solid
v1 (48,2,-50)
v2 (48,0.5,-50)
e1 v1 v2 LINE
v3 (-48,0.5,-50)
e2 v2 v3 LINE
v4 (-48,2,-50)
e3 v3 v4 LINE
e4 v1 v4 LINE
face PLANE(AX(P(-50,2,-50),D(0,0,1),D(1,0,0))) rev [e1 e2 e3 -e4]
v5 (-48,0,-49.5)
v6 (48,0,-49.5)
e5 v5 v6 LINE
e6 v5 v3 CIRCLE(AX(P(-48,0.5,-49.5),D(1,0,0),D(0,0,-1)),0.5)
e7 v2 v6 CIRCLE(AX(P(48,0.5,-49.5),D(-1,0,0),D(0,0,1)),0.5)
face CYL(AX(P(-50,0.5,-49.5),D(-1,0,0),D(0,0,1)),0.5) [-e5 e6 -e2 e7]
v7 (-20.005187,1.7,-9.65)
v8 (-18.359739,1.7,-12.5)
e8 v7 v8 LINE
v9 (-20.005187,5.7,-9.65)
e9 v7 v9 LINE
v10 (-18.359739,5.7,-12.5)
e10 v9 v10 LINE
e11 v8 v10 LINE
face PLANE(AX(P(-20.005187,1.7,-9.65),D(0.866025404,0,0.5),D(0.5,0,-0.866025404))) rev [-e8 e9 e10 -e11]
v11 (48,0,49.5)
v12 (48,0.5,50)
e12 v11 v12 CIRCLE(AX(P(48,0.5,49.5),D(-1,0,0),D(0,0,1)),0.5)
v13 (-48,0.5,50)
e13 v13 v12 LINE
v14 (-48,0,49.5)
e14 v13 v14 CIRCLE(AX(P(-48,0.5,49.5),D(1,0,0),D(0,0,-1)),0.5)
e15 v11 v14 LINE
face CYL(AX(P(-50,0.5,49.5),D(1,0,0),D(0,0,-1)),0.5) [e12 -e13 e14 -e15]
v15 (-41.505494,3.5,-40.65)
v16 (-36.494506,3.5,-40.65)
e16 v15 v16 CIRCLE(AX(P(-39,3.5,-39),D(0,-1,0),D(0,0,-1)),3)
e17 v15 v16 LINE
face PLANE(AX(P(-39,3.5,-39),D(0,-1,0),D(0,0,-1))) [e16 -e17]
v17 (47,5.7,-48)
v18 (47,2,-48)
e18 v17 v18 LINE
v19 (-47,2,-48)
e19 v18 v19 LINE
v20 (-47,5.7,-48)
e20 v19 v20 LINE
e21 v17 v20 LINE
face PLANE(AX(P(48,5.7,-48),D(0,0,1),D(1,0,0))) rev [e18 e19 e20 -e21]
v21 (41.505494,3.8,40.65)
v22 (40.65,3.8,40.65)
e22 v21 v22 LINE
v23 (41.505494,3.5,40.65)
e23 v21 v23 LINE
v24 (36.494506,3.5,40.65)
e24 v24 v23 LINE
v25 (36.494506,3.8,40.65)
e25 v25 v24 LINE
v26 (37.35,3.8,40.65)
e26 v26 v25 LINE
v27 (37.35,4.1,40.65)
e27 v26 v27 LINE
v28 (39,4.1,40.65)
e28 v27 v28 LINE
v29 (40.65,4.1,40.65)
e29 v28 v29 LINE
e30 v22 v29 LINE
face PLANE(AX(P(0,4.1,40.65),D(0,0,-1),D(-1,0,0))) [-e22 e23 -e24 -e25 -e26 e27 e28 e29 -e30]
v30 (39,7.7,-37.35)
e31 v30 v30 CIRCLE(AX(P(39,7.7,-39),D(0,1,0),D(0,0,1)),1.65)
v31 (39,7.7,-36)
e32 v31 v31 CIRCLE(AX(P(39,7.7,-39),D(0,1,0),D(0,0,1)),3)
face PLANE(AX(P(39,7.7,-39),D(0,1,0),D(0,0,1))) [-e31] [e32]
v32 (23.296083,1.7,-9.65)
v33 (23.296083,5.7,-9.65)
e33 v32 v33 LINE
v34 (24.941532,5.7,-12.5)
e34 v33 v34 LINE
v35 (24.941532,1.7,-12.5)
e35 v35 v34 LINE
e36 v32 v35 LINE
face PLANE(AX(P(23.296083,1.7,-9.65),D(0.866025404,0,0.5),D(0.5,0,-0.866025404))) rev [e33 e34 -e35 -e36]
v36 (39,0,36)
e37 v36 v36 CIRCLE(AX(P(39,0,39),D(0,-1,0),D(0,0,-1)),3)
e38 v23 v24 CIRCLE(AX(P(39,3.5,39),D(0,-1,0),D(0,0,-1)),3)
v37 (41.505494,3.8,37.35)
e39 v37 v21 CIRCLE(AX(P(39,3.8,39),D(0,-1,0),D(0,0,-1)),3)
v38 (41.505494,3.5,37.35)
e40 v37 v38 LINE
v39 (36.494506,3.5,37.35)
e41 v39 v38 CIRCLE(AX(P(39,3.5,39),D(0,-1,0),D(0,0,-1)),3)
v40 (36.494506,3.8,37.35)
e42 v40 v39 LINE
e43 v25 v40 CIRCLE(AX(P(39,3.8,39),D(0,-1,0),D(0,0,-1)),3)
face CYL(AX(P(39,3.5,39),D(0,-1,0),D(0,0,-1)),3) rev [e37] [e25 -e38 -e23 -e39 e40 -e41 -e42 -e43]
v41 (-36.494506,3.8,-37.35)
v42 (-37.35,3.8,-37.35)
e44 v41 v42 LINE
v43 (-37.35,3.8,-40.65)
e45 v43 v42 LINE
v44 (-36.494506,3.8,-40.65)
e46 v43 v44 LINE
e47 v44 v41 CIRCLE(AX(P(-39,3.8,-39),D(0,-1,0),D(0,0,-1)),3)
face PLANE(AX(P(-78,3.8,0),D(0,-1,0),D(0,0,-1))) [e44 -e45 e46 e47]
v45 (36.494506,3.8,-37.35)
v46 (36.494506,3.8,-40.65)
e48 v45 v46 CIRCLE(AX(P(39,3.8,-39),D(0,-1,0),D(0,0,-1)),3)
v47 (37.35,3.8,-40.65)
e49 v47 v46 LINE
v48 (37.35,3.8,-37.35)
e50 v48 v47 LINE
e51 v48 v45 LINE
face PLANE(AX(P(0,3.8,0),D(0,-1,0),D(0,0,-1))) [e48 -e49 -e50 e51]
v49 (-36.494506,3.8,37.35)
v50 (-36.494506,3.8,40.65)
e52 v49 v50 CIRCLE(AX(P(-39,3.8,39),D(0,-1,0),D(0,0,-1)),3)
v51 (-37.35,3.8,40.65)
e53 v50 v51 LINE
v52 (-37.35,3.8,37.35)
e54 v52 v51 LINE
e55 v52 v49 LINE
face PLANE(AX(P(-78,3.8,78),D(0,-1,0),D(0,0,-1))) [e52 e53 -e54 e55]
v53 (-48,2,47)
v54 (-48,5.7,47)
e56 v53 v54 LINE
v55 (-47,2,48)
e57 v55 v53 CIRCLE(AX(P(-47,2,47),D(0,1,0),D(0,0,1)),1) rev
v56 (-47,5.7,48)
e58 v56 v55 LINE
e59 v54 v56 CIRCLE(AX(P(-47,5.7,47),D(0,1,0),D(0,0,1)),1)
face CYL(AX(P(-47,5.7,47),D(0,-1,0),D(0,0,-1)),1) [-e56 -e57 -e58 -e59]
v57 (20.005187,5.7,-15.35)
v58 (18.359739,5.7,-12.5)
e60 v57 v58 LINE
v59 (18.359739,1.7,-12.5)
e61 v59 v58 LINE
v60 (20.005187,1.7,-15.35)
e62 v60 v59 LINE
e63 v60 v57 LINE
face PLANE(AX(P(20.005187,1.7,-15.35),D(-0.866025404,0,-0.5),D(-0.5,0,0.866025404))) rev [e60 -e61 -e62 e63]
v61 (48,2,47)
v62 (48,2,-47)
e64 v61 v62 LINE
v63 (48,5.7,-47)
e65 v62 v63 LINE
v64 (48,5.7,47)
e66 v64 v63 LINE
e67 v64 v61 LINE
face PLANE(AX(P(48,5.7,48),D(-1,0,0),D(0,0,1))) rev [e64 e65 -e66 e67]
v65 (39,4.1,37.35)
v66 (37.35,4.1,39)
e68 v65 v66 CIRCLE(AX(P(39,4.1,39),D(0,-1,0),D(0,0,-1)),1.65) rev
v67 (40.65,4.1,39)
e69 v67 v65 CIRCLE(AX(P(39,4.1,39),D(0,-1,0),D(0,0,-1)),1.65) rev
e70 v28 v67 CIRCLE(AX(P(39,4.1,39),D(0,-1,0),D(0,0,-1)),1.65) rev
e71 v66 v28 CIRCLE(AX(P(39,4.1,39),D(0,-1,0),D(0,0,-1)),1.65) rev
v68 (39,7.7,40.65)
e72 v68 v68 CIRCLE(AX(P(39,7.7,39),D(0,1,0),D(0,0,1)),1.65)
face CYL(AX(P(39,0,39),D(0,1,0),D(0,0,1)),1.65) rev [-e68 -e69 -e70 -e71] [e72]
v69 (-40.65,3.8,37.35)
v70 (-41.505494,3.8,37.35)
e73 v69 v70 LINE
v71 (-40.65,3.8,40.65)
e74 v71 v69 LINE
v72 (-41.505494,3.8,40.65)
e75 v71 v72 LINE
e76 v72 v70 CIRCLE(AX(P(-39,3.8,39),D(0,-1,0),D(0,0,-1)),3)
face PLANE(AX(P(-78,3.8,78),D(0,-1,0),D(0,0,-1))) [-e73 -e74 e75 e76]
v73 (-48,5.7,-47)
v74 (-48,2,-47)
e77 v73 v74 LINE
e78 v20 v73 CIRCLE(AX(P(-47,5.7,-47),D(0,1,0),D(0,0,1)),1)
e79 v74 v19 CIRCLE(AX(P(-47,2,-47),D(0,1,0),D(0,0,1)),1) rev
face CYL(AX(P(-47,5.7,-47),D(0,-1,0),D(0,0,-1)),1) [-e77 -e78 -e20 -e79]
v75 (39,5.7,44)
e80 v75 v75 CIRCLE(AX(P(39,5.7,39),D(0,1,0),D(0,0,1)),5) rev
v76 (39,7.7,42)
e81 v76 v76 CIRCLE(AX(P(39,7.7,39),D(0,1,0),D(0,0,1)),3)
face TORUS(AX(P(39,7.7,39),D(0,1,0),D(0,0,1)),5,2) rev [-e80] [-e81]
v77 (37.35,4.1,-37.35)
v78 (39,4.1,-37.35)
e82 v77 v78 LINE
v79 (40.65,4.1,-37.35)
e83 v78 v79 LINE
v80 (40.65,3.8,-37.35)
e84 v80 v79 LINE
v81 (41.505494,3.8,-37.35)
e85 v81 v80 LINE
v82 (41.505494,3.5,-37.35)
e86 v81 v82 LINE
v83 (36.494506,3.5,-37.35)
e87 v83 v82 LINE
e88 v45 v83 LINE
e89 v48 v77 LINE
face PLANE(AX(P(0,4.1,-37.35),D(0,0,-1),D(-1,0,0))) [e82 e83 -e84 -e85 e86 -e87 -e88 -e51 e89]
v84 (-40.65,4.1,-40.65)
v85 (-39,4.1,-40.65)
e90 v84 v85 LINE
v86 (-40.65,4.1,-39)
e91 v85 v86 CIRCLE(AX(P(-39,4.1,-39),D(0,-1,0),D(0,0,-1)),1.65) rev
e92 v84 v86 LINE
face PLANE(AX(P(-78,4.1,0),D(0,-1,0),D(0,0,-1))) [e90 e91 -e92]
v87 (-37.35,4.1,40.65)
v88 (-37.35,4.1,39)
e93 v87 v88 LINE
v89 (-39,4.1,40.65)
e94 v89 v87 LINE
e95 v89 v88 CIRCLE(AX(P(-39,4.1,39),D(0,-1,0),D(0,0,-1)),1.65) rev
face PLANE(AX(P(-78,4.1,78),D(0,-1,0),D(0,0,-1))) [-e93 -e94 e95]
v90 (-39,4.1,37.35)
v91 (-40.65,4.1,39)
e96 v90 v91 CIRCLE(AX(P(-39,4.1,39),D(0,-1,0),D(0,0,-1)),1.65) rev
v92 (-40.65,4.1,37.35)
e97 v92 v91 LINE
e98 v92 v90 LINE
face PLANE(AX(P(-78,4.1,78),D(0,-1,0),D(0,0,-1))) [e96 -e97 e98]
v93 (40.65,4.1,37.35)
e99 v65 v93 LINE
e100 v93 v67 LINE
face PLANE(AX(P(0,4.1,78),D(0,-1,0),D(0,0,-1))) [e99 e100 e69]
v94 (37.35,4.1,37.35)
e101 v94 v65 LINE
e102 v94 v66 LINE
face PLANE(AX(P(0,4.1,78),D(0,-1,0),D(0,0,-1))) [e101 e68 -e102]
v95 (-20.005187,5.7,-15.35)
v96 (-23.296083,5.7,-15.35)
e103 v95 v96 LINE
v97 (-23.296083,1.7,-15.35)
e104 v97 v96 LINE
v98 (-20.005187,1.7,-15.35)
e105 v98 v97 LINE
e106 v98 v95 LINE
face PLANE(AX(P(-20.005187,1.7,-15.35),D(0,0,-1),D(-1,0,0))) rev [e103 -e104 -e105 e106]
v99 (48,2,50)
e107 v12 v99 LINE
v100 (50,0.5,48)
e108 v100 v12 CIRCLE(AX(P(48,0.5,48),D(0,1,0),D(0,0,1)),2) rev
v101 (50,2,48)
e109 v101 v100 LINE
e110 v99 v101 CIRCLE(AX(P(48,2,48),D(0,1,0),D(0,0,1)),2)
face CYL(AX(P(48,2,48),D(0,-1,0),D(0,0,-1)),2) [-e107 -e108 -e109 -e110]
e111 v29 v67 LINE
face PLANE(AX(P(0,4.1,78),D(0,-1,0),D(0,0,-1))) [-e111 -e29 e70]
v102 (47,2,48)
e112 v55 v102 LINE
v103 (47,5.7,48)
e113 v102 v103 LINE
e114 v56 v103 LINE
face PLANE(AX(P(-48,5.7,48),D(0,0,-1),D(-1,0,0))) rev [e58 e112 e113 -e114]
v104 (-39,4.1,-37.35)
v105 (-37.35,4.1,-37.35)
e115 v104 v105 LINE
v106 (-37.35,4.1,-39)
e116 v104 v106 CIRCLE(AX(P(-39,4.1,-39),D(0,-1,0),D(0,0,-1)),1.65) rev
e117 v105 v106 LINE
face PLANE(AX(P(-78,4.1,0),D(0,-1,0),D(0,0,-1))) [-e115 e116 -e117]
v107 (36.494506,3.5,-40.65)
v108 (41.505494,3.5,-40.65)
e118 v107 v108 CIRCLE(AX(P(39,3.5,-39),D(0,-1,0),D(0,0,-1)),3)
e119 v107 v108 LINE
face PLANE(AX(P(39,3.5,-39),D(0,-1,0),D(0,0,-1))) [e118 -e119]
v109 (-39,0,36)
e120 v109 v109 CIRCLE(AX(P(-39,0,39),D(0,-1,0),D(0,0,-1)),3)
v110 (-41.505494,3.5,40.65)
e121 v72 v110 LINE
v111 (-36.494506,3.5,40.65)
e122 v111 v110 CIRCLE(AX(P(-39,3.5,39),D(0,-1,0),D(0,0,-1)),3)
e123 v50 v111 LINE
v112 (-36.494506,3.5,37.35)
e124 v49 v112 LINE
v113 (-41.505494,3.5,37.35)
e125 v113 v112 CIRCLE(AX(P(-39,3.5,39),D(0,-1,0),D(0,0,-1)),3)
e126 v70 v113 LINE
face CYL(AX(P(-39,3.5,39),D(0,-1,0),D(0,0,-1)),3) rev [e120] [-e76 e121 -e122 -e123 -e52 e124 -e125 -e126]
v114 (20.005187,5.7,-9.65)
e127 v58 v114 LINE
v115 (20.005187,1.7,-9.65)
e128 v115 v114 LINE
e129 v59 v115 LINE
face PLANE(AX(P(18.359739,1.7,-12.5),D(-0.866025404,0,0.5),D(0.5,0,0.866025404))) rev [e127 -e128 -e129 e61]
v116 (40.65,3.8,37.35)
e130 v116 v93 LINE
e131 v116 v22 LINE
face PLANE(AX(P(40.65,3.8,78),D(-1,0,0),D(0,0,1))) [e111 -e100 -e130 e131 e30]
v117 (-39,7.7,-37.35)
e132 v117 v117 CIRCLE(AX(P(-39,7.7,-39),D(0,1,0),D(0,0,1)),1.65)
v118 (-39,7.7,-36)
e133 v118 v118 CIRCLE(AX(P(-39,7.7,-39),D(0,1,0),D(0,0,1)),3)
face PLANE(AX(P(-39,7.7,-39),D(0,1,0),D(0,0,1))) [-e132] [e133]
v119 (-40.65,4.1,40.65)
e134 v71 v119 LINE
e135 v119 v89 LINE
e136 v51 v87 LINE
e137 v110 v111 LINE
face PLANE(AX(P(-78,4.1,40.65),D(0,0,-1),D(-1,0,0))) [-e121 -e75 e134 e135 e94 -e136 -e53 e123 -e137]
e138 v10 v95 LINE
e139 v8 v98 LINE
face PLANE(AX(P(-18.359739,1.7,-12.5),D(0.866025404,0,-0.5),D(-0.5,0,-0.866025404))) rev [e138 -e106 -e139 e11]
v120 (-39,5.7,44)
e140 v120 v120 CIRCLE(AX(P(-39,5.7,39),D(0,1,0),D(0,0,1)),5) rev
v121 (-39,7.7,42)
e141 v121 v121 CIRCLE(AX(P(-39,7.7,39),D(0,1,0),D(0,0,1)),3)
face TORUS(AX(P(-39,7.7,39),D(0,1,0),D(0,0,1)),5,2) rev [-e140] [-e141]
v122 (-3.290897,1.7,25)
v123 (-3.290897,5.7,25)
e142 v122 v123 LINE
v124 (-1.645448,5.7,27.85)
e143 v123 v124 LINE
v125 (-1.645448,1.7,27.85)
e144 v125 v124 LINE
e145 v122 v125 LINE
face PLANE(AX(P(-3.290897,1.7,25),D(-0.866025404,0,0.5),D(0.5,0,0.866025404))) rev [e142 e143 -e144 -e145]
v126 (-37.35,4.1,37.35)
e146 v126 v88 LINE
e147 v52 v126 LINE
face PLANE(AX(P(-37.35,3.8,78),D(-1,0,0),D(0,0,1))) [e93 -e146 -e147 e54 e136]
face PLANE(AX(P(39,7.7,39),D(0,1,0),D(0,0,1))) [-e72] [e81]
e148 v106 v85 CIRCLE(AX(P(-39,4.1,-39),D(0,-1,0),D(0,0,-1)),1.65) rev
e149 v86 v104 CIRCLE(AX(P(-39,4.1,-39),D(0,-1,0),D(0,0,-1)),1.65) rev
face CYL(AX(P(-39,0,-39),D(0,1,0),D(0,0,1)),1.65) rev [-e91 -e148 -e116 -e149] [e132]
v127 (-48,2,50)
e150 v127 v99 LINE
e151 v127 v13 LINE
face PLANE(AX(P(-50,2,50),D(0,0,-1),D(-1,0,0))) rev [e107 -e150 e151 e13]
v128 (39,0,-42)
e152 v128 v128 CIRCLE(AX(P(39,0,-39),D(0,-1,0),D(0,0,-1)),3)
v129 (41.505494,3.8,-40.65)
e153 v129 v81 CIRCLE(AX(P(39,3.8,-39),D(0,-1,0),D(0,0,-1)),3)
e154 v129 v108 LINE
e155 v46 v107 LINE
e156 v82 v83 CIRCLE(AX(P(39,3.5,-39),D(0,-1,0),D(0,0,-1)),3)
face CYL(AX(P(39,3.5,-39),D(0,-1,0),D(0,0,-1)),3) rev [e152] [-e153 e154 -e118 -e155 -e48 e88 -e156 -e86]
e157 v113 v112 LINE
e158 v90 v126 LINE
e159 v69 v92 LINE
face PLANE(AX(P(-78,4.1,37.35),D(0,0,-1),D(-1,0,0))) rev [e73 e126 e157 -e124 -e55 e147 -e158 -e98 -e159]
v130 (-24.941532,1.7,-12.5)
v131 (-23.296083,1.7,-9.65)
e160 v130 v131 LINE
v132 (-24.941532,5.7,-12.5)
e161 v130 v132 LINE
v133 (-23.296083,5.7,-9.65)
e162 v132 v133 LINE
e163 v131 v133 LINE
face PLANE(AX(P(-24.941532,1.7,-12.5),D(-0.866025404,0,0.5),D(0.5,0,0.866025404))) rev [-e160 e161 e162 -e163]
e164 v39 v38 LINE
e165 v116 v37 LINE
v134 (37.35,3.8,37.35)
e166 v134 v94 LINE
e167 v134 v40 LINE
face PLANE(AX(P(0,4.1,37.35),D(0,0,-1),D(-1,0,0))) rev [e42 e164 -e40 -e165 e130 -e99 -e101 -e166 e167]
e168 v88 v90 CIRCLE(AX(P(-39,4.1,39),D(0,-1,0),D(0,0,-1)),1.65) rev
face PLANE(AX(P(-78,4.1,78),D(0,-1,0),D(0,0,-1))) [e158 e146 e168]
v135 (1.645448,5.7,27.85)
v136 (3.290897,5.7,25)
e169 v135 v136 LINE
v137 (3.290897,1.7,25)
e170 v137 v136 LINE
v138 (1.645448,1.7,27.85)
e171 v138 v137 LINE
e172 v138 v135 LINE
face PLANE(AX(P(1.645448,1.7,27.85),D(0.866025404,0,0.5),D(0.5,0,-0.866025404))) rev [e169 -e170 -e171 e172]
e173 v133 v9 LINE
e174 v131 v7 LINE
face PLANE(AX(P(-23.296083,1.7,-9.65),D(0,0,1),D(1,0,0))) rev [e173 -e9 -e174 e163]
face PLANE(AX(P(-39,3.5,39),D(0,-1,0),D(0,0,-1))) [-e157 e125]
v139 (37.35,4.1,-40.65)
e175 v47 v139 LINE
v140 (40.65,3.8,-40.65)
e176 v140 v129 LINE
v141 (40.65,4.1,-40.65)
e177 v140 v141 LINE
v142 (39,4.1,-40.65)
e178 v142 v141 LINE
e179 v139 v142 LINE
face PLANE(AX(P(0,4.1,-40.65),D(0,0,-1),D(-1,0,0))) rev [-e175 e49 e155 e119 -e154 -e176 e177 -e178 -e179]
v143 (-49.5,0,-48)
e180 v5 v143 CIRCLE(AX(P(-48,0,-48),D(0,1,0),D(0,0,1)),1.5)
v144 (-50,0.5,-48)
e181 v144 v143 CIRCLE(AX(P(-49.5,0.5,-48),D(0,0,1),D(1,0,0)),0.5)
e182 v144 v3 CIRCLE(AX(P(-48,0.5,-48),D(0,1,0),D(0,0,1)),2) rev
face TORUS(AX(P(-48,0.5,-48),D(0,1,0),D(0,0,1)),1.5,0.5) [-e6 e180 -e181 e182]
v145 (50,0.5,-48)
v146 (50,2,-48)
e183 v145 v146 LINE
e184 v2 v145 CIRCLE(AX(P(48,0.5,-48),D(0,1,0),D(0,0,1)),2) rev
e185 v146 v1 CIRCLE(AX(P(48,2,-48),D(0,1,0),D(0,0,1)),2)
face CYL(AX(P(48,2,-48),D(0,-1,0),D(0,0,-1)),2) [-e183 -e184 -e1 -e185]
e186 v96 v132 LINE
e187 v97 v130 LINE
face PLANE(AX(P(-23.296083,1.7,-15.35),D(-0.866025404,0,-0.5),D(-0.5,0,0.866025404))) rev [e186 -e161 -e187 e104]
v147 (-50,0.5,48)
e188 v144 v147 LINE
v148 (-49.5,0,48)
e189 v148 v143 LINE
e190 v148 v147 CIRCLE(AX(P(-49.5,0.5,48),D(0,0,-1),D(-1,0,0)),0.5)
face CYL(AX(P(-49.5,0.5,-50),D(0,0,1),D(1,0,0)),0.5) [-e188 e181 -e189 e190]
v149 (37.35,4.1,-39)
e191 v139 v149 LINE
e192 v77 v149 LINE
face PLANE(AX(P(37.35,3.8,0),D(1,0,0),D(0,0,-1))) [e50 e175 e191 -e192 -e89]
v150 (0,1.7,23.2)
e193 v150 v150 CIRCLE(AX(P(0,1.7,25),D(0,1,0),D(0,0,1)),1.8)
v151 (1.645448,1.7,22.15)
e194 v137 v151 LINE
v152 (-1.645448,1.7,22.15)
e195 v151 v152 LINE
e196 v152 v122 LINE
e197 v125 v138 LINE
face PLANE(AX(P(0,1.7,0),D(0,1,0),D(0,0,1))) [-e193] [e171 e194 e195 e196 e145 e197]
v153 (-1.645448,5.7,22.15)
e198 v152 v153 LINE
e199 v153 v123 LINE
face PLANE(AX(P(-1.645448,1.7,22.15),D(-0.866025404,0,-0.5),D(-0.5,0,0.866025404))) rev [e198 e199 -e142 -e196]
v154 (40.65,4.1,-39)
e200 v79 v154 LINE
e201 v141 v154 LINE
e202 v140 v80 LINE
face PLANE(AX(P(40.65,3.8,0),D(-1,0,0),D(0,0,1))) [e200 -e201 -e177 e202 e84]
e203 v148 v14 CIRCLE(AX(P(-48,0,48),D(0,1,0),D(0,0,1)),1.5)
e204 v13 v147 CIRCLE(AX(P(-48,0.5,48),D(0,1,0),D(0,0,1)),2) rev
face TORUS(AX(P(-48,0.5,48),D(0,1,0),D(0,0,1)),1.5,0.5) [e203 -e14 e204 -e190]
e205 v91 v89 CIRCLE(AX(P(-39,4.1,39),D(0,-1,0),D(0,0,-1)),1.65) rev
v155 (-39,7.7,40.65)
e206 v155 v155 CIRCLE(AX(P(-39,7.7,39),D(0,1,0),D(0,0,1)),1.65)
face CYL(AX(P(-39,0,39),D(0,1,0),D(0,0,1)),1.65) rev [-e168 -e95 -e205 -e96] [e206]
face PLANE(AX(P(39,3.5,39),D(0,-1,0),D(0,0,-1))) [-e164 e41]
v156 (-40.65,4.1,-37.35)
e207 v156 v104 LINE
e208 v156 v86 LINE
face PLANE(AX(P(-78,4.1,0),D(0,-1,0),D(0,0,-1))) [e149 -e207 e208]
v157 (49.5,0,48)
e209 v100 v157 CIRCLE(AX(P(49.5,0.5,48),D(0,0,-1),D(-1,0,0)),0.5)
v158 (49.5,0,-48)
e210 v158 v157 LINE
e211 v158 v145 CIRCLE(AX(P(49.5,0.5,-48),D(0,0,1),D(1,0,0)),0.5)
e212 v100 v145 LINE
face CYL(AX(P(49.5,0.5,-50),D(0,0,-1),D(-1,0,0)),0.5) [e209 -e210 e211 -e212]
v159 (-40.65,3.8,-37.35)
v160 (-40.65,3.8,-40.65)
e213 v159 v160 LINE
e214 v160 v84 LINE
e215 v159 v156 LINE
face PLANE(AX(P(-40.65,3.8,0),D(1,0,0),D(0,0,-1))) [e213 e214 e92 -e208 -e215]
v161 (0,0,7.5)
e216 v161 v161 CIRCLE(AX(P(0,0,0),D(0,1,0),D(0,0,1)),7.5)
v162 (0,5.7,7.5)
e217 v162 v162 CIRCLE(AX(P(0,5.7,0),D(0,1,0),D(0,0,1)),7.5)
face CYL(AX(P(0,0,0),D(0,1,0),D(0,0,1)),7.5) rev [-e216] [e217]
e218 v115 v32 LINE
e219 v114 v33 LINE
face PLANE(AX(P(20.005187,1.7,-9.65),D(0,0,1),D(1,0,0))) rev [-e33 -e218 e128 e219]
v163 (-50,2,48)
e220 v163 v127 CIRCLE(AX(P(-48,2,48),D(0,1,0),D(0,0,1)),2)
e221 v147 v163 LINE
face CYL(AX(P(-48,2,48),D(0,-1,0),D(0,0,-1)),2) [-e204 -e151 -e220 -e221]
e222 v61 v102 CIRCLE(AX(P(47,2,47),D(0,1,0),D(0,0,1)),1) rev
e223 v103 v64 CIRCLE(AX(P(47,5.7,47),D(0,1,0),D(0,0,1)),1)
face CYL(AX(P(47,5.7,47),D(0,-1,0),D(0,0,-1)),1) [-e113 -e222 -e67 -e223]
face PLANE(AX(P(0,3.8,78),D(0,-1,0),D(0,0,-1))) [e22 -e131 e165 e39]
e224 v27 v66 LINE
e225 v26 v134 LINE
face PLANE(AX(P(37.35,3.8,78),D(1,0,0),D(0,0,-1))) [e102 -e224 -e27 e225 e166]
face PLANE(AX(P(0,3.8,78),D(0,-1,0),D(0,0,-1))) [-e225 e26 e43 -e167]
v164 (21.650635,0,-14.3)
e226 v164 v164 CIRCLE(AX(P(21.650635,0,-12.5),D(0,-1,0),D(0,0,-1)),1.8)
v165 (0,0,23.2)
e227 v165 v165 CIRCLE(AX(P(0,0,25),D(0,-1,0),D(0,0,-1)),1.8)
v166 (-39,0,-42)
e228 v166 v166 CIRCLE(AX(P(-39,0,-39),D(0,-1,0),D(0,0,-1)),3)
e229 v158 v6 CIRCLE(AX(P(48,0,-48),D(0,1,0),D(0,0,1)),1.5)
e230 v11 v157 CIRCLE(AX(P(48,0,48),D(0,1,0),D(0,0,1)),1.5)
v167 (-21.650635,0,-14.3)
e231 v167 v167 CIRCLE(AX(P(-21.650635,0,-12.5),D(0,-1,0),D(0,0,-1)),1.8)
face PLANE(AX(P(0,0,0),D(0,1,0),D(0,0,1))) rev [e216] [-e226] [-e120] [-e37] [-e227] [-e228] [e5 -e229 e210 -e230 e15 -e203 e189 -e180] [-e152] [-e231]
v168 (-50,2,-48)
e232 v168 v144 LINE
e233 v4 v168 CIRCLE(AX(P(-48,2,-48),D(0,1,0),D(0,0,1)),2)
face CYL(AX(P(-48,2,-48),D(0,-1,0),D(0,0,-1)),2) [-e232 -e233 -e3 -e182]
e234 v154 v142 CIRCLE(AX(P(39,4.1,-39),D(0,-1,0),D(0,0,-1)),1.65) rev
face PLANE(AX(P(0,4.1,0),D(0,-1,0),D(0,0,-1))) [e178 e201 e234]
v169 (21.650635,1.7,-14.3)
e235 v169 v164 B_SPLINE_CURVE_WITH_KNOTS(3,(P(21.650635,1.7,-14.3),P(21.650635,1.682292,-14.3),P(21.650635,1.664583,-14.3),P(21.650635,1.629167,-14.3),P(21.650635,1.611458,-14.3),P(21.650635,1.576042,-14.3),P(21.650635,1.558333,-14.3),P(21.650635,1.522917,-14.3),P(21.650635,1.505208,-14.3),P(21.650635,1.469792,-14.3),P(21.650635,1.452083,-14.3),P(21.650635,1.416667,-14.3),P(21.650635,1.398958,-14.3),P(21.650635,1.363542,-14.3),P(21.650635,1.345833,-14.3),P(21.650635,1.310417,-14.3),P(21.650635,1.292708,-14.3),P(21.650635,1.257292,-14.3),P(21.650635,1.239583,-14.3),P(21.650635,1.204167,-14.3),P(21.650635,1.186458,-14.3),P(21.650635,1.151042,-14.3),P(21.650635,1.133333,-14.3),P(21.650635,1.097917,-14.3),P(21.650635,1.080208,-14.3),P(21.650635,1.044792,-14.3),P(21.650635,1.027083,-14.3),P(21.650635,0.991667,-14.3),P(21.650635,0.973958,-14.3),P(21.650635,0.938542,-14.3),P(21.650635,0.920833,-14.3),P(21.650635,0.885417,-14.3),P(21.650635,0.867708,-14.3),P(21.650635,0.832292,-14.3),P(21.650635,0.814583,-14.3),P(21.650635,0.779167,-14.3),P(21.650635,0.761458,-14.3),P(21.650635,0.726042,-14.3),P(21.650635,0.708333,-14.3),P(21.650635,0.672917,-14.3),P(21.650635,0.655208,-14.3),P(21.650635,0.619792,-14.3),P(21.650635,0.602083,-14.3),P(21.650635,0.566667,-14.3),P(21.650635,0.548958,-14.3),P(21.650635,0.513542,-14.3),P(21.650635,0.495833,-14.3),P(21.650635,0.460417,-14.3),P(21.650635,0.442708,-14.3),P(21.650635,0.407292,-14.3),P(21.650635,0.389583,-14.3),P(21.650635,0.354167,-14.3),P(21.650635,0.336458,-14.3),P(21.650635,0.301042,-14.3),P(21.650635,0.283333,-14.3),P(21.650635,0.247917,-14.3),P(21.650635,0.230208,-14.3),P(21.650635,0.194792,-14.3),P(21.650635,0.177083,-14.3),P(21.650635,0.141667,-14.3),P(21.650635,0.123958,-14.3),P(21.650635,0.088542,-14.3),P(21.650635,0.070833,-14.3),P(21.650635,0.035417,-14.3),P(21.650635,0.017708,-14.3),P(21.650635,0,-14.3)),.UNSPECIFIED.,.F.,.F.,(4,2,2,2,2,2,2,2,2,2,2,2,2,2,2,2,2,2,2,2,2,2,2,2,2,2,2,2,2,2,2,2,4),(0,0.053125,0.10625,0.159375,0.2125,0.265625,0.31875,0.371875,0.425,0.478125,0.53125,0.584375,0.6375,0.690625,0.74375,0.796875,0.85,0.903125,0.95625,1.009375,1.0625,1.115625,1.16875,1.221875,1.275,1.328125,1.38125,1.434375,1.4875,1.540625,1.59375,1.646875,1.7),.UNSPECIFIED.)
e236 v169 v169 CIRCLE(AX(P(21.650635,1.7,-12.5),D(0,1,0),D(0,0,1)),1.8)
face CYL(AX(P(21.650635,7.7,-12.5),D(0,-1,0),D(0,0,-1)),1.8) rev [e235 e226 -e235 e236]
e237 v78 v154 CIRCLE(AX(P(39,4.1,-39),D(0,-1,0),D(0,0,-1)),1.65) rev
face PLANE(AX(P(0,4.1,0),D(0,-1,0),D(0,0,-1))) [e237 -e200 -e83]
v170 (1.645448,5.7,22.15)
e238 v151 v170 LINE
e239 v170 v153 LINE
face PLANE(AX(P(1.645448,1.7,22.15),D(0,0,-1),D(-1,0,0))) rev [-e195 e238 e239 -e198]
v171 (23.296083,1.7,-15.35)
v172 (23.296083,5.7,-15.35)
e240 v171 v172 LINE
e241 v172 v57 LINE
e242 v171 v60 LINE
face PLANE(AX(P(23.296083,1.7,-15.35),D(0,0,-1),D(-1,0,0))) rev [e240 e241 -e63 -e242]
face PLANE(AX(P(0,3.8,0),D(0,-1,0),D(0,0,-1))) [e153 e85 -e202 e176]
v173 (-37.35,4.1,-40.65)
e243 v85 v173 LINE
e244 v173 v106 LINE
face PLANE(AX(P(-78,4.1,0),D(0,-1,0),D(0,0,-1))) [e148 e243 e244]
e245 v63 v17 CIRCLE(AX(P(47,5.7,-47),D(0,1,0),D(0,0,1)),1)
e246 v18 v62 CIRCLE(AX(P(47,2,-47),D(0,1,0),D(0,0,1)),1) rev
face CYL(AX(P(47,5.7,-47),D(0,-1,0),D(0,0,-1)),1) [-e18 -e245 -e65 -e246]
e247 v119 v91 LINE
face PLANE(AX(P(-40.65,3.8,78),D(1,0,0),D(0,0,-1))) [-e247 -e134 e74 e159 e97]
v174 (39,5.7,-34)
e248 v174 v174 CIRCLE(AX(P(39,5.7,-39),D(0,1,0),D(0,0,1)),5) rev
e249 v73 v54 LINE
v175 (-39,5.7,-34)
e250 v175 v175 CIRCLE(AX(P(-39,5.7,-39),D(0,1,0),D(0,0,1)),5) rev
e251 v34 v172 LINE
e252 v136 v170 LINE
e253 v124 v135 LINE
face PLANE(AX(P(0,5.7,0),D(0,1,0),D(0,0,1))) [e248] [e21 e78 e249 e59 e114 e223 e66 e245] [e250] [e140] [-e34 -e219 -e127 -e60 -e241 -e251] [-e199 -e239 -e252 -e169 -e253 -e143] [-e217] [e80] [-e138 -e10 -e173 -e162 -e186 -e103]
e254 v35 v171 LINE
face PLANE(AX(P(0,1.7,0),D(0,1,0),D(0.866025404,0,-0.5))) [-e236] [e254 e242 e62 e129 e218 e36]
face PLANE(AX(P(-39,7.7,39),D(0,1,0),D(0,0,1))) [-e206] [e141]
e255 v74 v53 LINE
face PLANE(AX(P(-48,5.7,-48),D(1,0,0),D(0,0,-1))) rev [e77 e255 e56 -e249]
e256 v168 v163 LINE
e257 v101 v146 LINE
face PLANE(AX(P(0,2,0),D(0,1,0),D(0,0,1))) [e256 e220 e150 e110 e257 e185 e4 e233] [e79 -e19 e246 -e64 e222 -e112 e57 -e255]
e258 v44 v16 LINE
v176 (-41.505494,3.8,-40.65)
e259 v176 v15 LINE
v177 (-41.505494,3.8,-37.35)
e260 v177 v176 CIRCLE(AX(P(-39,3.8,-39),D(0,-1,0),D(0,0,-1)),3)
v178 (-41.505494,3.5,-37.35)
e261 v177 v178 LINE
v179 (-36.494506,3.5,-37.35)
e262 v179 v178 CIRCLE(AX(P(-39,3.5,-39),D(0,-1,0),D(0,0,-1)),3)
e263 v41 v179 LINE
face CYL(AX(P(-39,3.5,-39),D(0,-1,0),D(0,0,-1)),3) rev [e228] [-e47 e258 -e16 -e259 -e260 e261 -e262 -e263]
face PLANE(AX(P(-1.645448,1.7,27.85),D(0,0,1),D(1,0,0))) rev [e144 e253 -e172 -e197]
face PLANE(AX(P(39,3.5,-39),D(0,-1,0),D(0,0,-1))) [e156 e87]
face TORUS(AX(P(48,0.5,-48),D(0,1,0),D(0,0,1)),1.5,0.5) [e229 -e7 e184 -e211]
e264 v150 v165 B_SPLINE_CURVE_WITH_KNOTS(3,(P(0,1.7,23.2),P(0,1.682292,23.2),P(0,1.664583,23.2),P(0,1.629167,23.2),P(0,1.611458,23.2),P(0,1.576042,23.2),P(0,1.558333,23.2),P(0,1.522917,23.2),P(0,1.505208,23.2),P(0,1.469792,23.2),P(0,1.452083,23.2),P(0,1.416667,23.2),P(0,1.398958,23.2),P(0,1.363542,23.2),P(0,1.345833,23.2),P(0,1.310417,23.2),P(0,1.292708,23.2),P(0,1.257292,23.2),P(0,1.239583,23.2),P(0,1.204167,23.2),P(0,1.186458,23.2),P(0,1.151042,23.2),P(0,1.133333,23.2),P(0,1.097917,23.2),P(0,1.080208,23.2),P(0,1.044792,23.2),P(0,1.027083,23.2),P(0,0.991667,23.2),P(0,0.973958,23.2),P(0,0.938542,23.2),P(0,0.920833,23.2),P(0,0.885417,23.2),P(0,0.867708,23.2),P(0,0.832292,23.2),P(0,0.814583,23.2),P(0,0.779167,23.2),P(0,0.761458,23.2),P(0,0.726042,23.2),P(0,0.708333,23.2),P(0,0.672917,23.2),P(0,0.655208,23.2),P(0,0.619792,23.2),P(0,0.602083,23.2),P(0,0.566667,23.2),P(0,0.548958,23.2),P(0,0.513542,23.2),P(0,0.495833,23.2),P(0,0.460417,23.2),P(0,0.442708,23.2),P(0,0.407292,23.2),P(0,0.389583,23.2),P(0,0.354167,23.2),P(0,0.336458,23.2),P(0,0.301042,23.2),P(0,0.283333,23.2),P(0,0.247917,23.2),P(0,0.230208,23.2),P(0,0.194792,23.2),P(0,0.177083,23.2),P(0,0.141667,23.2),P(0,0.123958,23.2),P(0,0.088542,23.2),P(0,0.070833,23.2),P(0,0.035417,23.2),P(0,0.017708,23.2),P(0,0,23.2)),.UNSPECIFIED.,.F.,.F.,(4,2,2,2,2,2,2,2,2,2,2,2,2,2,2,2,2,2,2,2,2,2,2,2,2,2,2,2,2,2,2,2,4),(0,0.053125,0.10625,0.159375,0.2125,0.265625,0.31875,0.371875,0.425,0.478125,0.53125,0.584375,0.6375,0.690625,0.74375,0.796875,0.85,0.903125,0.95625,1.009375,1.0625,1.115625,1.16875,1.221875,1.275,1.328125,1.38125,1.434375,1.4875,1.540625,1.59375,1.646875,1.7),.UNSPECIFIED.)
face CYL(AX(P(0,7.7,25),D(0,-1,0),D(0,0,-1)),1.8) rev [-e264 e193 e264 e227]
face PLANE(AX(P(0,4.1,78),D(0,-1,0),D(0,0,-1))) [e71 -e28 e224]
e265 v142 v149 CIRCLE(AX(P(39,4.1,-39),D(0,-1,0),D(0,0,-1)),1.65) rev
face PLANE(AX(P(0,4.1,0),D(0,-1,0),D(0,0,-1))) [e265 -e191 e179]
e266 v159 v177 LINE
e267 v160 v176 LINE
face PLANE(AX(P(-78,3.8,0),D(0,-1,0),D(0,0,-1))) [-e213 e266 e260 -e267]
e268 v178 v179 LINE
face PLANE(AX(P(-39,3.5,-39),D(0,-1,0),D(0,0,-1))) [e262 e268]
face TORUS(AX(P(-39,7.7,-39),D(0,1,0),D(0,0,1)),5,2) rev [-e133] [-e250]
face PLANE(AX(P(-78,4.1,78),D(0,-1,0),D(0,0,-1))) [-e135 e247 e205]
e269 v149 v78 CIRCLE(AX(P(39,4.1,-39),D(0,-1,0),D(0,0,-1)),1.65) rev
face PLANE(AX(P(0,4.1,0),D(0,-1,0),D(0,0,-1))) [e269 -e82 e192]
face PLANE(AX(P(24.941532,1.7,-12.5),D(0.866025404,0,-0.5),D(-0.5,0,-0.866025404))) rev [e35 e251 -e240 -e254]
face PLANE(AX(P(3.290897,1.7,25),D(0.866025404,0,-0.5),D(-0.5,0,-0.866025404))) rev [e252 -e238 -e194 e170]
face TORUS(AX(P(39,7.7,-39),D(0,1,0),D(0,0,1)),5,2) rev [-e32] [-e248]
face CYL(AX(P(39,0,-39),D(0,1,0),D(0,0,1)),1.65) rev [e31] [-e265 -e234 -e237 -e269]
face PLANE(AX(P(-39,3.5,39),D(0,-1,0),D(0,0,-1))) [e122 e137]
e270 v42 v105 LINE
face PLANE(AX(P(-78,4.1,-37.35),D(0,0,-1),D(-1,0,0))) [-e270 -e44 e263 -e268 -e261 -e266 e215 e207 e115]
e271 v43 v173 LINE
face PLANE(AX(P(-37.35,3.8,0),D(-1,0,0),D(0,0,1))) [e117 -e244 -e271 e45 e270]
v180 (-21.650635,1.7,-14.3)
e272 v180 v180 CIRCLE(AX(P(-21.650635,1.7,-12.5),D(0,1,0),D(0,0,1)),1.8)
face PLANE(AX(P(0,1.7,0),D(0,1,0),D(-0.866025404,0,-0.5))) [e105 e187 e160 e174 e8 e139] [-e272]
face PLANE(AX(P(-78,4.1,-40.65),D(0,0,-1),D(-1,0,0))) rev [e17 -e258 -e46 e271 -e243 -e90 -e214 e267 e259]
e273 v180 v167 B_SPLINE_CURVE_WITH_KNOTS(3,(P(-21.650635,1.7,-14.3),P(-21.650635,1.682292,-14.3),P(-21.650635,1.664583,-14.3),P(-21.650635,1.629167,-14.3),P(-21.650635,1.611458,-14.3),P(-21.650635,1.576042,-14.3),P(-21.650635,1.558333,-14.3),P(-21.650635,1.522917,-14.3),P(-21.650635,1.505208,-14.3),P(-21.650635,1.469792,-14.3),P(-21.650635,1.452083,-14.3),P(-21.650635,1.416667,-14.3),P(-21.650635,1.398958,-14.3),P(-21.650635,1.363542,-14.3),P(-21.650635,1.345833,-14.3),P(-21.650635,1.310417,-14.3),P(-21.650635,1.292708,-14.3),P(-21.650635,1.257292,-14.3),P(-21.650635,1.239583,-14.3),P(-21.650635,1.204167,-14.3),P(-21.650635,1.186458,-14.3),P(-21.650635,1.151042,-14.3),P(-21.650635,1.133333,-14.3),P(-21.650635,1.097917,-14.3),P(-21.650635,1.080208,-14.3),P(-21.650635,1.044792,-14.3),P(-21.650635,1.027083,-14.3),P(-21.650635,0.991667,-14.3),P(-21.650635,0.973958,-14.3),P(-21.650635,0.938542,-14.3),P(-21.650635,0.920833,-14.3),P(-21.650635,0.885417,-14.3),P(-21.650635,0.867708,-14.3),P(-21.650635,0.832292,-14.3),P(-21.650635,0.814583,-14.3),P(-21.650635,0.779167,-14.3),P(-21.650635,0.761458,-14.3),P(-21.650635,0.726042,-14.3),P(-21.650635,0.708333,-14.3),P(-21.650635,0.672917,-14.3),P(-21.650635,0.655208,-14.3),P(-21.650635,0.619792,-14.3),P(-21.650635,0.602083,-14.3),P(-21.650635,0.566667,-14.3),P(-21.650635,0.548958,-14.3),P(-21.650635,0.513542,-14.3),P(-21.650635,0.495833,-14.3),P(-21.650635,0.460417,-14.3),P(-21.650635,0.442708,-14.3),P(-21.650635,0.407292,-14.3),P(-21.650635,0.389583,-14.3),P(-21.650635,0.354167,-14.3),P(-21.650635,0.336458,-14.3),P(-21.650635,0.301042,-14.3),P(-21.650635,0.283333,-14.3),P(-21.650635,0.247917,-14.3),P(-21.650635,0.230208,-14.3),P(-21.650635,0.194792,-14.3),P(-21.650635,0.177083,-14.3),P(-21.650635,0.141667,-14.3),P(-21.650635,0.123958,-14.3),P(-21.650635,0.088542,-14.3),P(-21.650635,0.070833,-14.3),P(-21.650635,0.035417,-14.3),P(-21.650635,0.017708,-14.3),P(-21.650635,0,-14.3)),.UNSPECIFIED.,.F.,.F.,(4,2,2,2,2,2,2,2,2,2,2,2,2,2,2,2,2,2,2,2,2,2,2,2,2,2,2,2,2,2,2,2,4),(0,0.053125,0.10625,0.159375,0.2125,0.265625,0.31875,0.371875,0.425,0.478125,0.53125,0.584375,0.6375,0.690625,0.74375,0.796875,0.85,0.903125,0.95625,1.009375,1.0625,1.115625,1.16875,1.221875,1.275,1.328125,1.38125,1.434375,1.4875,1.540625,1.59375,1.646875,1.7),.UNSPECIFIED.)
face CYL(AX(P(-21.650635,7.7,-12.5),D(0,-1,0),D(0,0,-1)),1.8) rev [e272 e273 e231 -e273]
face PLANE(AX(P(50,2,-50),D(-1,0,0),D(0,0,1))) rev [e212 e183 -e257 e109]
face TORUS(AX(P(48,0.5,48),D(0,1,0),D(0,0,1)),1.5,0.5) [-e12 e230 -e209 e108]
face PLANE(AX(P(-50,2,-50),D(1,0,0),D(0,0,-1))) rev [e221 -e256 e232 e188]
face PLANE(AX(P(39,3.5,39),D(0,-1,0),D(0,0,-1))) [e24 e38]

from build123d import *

# Parameters (mm, degrees)
SKETCH1_W                       = 100
SKETCH1_H                       = 100
BOSS_EXTRUDE1_DEPTH             = 2
SKETCH4_W                       = 96
SKETCH4_H                       = 96
BOSS_EXTRUDE3_DEPTH             = 3.7
SKETCH5_R                       = 1.65
CUT_EXTRUDE1_DEPTH              = 71.940045109
SKETCH6_R                       = 3
CUT_EXTRUDE2_DEPTH              = 3.5
FILETE1_R                       = 0.5
CUT_EXTRUDE3_DEPTH              = 0.6
FILLET1_R                       = 2
FILLET2_R                       = 1
BOSS_EXTRUDE7_START             = 0.3
BOSS_EXTRUDE7_DEPTH             = 0.3
LPATTERN1_COUNT                 = 2
LPATTERN1_PITCH                 = 78
LPATTERN1_COUNT_DIR2            = 2
LPATTERN1_PITCH_DIR2            = 78
LPATTERN2_COUNT                 = 2
LPATTERN2_PITCH                 = 78
LPATTERN2_COUNT_DIR2            = 2
LPATTERN2_PITCH_DIR2            = 78
SKETCH15_R                      = 3
SKETCH15_R_2                    = 1.65
BOSS_EXTRUDE8_DEPTH             = 2
LPATTERN3_COUNT                 = 2
LPATTERN3_PITCH                 = 78
LPATTERN3_COUNT_DIR2            = 2
LPATTERN3_PITCH_DIR2            = 78
FILLET3_R                       = 2
ESBO_O1_R                       = 1.65
CORTE_EXTRUS_O1_DEPTH           = 72.128686267
CORTE_EXTRUS_O3_DEPTH           = 4
ESBO_O6_R                       = 7.5
CORTE_EXTRUS_O4_DEPTH           = 71.940045179
RESSALTO_EXTRUS_O3_START        = -5.7
ESBO_O8_R                       = 1.65
RESSALTO_EXTRUS_O3_DEPTH        = 5.7
PADR_OCIRCULAR2_COUNT           = 3
PADR_OCIRCULAR2_COPY_1_SKETCH_R = 1.65
PADR_OCIRCULAR2_COPY_1_DEPTH    = 72.128686267
PADR_OCIRCULAR2_COPY_2_SKETCH_R = 1.65
PADR_OCIRCULAR2_COPY_2_DEPTH    = 72.128686267
RESSALTO_EXTRUS_O4_START        = -5.7
ESBO_O10_R                      = 1.65
RESSALTO_EXTRUS_O4_DEPTH        = 5.7
ESBO_O11_R                      = 1.8
CORTE_EXTRUS_O5_DEPTH           = 72.128686267


# Some blends are built 0.0001 mm under size
with BuildPart() as part:
    # Sketch1 → Boss-Extrude1 (new body)
    with BuildSketch(Plane(origin=(0, 0, 0), x_dir=(1, 0, 0), z_dir=(0, 1, 0))):
        Rectangle(SKETCH1_W, SKETCH1_H)
    extrude(amount=BOSS_EXTRUDE1_DEPTH)

    # Sketch4 → Boss-Extrude3 (add)
    with BuildSketch(Plane(origin=(0, 2, 0), x_dir=(1, 0, 0), z_dir=(0, 1, 0))):
        Rectangle(SKETCH4_W, SKETCH4_H)
    extrude(amount=BOSS_EXTRUDE3_DEPTH)

    # Sketch5 → Cut-Extrude1 (cut, through all)
    with BuildSketch(Plane(origin=(0, 5.7, 0), x_dir=(1, 0, 0), z_dir=(0, 1, 0))):
        with Locations(Location((-39, 39, 0), (0, 0, 270))):
            Circle(SKETCH5_R)
        with Locations(Location((39, -39, 0), (0, 0, 270))):
            Circle(SKETCH5_R)
        with Locations(Location((-39, -39, 0), (0, 0, 270))):
            Circle(SKETCH5_R)
        with Locations(Location((39, 39, 0), (0, 0, 270))):
            Circle(SKETCH5_R)
    extrude(amount=-CUT_EXTRUDE1_DEPTH, mode=Mode.SUBTRACT)

    # Sketch6 → Cut-Extrude2 (cut)
    with BuildSketch(Plane.XZ):
        with Locations(Location((39, -39, 0), (0, 0, 270))):
            Circle(SKETCH6_R)
        with Locations(Location((-39, -39, 0), (0, 0, 270))):
            Circle(SKETCH6_R)
        with Locations(Location((-39, 39, 0), (0, 0, 270))):
            Circle(SKETCH6_R)
        with Locations(Location((39, 39, 0), (0, 0, 270))):
            Circle(SKETCH6_R)
    extrude(amount=-CUT_EXTRUDE2_DEPTH, mode=Mode.SUBTRACT)

    # Filete1
    filete1_edges = [part.edges().sort_by_distance(p)[0] for p in [
        (0, 0, 50),
        (-50, 0, 0),
        (0, 0, -50),
        (50, 0, 0),
    ]]
    fillet(filete1_edges, radius=FILETE1_R)

    # Sketch7 → Cut-Extrude3 (cut)
    with BuildSketch(Plane(origin=(0, 3.5, 0), x_dir=(-1, 0, 0), z_dir=(0, -1, 0))):
        with BuildLine():
            ThreePointArc((-36.494506037, 37.35), (-36, 39), (-36.494506037, 40.65))
            Line((-36.494506037, 40.65), (-39, 40.65))
            ThreePointArc((-39, 40.65), (-37.35, 39), (-39, 37.35))
            Line((-39, 37.35), (-36.494506037, 37.35))
        make_face()
        with BuildLine():
            ThreePointArc((-39, 37.35), (-40.65, 39), (-39, 40.65))
            Line((-39, 40.65), (-41.505493963, 40.65))
            ThreePointArc((-41.505493963, 40.65), (-42, 39), (-41.505493963, 37.35))
            Line((-41.505493963, 37.35), (-39, 37.35))
        make_face()
    cut_extrude3 = extrude(amount=-CUT_EXTRUDE3_DEPTH, mode=Mode.SUBTRACT)

    # Fillet1
    # the kernel refuses this fillet: 2 mm, written as the material it takes off along each edge
    with BuildSketch(Plane(origin=(-48, 0, -48), x_dir=(-1, 0, 0), z_dir=(0, 0, 1))) as fillet1_piece_1:
        with BuildLine():
            CenterArc((1.5, -0.5), 0.5, 0, 90)
            Line((2, -0.5), (2, 0))
            Line((2, 0), (1.5, 0))
        make_face()
    revolve(axis=Axis((-48, 0, -48), (0, -1, 0)), revolution_arc=90, mode=Mode.SUBTRACT)
    with BuildSketch(Plane(origin=(48, 0, -48), x_dir=(0, 0, -1), z_dir=(-1, 0, 0))) as fillet1_piece_2:
        with BuildLine():
            CenterArc((1.5, -0.5), 0.5, 0, 90)
            Line((2, -0.5), (2, 0))
            Line((2, 0), (1.5, 0))
        make_face()
    revolve(axis=Axis((48, 0, -48), (0, -1, 0)), revolution_arc=90, mode=Mode.SUBTRACT)
    with BuildSketch(Plane(origin=(-48, 0, 48), x_dir=(0, 0, 1), z_dir=(1, 0, 0))) as fillet1_piece_3:
        with BuildLine():
            CenterArc((1.5, -0.5), 0.5, 0, 90)
            Line((2, -0.5), (2, 0))
            Line((2, 0), (1.5, 0))
        make_face()
    revolve(axis=Axis((-48, 0, 48), (0, -1, 0)), revolution_arc=90, mode=Mode.SUBTRACT)
    with BuildSketch(Plane(origin=(48, 0, 48), x_dir=(1, 0, 0), z_dir=(0, 0, -1))) as fillet1_piece_4:
        with BuildLine():
            CenterArc((1.5, -0.5), 0.5, 0, 90)
            Line((2, -0.5), (2, 0))
            Line((2, 0), (1.5, 0))
        make_face()
    revolve(axis=Axis((48, 0, 48), (0, -1, 0)), revolution_arc=90, mode=Mode.SUBTRACT)
    with BuildSketch(Plane(origin=(50, 0, 50), x_dir=(0, 0, -1), z_dir=(0, 1, 0)), Plane(origin=(-50, 0, 50), x_dir=(1, 0, 0), z_dir=(0, 1, 0)), Plane(origin=(50, 0, -50), x_dir=(-1, 0, 0), z_dir=(0, 1, 0))) as fillet1_piece_5:
        with BuildLine():
            CenterArc((FILLET1_R, FILLET1_R), FILLET1_R, 180, 90)
            Line((0, FILLET1_R), (0, 0))
            Line((0, 0), (FILLET1_R, 0))
        make_face()
    extrude(amount=7, mode=Mode.SUBTRACT)
    with BuildSketch(Plane(origin=(-50, 0, -50), x_dir=(1, 0, 0), z_dir=(0, 1, 0))) as fillet1_piece_6:
        with BuildLine():
            CenterArc((FILLET1_R, -FILLET1_R), FILLET1_R, 90, 90)
            Line((0, -FILLET1_R), (0, 0))
            Line((0, 0), (FILLET1_R, 0))
        make_face()
    extrude(amount=7, mode=Mode.SUBTRACT)

    # Fillet2
    fillet2_edges = [part.edges().sort_by_distance(p)[0] for p in [
        (48, 3.85, -48),
        (-48, 3.85, -48),
        (-48, 3.85, 48),
        (48, 3.85, 48),
    ]]
    fillet(fillet2_edges, radius=FILLET2_R)

    # Sketch14 → Boss-Extrude7 (add)
    with BuildSketch(Plane.XZ.offset(-4.1).offset(BOSS_EXTRUDE7_START)):
        with BuildLine():
            Line((40.65, -39), (40.65, -40.65))
            Line((40.65, -40.65), (41.505493963, -40.65))
            ThreePointArc((41.505493963, -40.65), (42, -39), (41.505493963, -37.35))
            Line((41.505493963, -37.35), (40.65, -37.35))
            Line((40.65, -37.35), (40.65, -39))
        make_face()
        with BuildLine():
            Line((36.494506037, -40.65), (37.35, -40.65))
            Line((37.35, -40.65), (37.35, -39))
            Line((37.35, -39), (37.35, -37.35))
            Line((37.35, -37.35), (36.494506037, -37.35))
            ThreePointArc((36.494506037, -37.35), (36, -39), (36.494506037, -40.65))
        make_face()
    boss_extrude7 = extrude(amount=-BOSS_EXTRUDE7_DEPTH)

    # LPattern1: Cut-Extrude3 2 × 2
    with Locations(*[(-i * LPATTERN1_PITCH, 0, j * LPATTERN1_PITCH_DIR2) for i in range(LPATTERN1_COUNT) for j in range(LPATTERN1_COUNT_DIR2) if (i, j) != (0, 0)]):
        add(cut_extrude3, mode=Mode.SUBTRACT)

    # LPattern2: Boss-Extrude7 2 × 2
    with Locations(*[(-i * LPATTERN2_PITCH, 0, j * LPATTERN2_PITCH_DIR2) for i in range(LPATTERN2_COUNT) for j in range(LPATTERN2_COUNT_DIR2) if (i, j) != (0, 0)]):
        add(boss_extrude7)

    # Sketch15 → Boss-Extrude8 (add)
    with BuildSketch(Plane(origin=(0, 5.7, 0), x_dir=(1, 0, 0), z_dir=(0, 1, 0))):
        with Locations(Location((39, 39, 0), (0, 0, 90))):
            Circle(SKETCH15_R)
        with Locations(Location((39, 39, 0), (0, 0, 270))):
            Circle(SKETCH15_R_2, mode=Mode.SUBTRACT)
    boss_extrude8 = extrude(amount=BOSS_EXTRUDE8_DEPTH)

    # LPattern3: Boss-Extrude8 2 × 2
    with Locations(*[(-j * LPATTERN3_PITCH_DIR2, 0, i * LPATTERN3_PITCH) for i in range(LPATTERN3_COUNT) for j in range(LPATTERN3_COUNT_DIR2) if (i, j) != (0, 0)]):
        add(boss_extrude8)

    # Fillet3
    fillet3_edges = [part.edges().sort_by_distance(p)[0] for p in [
        (39, 5.7, -36),
        (-39, 5.7, -36),
        (39, 5.7, 42),
        (-39, 5.7, 42),
    ]]
    fillet(fillet3_edges, radius=FILLET3_R - 0.0001)  # a hair under: the kernel refuses the full size

    # Esboço1 → Corte-extrusão1 (cut, through all)
    with BuildSketch(Plane.XZ):
        with Locations(Location((0, -25, 0), (0, 0, 270))):
            Circle(ESBO_O1_R)
    corte_extrus_o1 = extrude(amount=-CORTE_EXTRUS_O1_DEPTH, mode=Mode.SUBTRACT)

    # Espelhar1: Corte-extrusão1 across plane
    add(corte_extrus_o1.mirror(Plane.XY), mode=Mode.SUBTRACT)

    # Esboço2 → Corte-extrusão3 (cut)
    with BuildSketch(Plane(origin=(0, 5.7, 0), x_dir=(1, 0, 0), z_dir=(0, 1, 0))):
        Polygon((1.645448267, -27.85), (3.290896534, -25), (1.645448267, -22.15), (-1.645448267, -22.15), (-3.290896534, -25), (-1.645448267, -27.85), align=None)
    corte_extrus_o3 = extrude(amount=-CORTE_EXTRUS_O3_DEPTH, mode=Mode.SUBTRACT)

    # Esboço6 → Corte-extrusão4 (cut, through all)
    with BuildSketch(Plane(origin=(0, 5.7, 0), x_dir=(1, 0, 0), z_dir=(0, 1, 0))):
        with Locations(Location((0, 0, 0), (0, 0, 270))):
            Circle(ESBO_O6_R)
    extrude(amount=-CORTE_EXTRUS_O4_DEPTH, mode=Mode.SUBTRACT)

    # Esboço8 → Ressalto-extrusão3 (add)
    with BuildSketch(Plane(origin=(0, 5.7, 0), x_dir=(1, 0, 0), z_dir=(0, 1, 0)).offset(RESSALTO_EXTRUS_O3_START)):
        with Locations((0, 25)):
            Circle(ESBO_O8_R)
    extrude(amount=RESSALTO_EXTRUS_O3_DEPTH)

    # PadrãoCircular2: Corte-extrusão1, Corte-extrusão3 ×3 about axis
    padr_ocircular2_axis = Axis((0, 0, 0), (0, 1, 0))
    add([corte_extrus_o1.rotate(padr_ocircular2_axis, i * 360 / PADR_OCIRCULAR2_COUNT) for i in range(1, PADR_OCIRCULAR2_COUNT)], mode=Mode.SUBTRACT)
    add([corte_extrus_o3.rotate(padr_ocircular2_axis, i * 360 / PADR_OCIRCULAR2_COUNT) for i in range(1, PADR_OCIRCULAR2_COUNT)], mode=Mode.SUBTRACT)

    # PadrãoCircular2 copy 1 sketch → PadrãoCircular2 copy 1 (cut, through all)
    with BuildSketch(Plane(origin=(0, 0, 0), x_dir=(-0.4999999999999998, 0, -0.8660254037844387), z_dir=(0, -1, 0))):
        with Locations((0, 25)):
            Circle(PADR_OCIRCULAR2_COPY_1_SKETCH_R)
    extrude(amount=-PADR_OCIRCULAR2_COPY_1_DEPTH, mode=Mode.SUBTRACT)

    # PadrãoCircular2 copy 2 sketch → PadrãoCircular2 copy 2 (cut, through all)
    with BuildSketch(Plane(origin=(0, 0, 0), x_dir=(-0.5000000000000004, 0, 0.8660254037844384), z_dir=(0, -1, 0))):
        with Locations((0, 25)):
            Circle(PADR_OCIRCULAR2_COPY_2_SKETCH_R)
    extrude(amount=-PADR_OCIRCULAR2_COPY_2_DEPTH, mode=Mode.SUBTRACT)

    # Esboço10 → Ressalto-extrusão4 (add)
    with BuildSketch(Plane(origin=(0, 5.7, 0), x_dir=(1, 0, 0), z_dir=(0, 1, 0)).offset(RESSALTO_EXTRUS_O4_START)):
        with Locations((-21.650635095, -12.5)):
            Circle(ESBO_O10_R)
        with Locations((21.650635095, -12.5)):
            Circle(ESBO_O10_R)
    extrude(amount=RESSALTO_EXTRUS_O4_DEPTH)

    # Esboço11 → Corte-extrusão5 (cut, through all)
    with BuildSketch(Plane.XZ):
        with Locations(Location((21.650635095, -12.5, 0), (0, 0, 270))):
            Circle(ESBO_O11_R)
        with Locations(Location((-21.650635095, -12.5, 0), (0, 0, 270))):
            Circle(ESBO_O11_R)
        with Locations(Location((0, 25, 0), (0, 0, 270))):
            Circle(ESBO_O11_R)
    extrude(amount=-CORTE_EXTRUS_O5_DEPTH, mode=Mode.SUBTRACT)


solid = part.part
